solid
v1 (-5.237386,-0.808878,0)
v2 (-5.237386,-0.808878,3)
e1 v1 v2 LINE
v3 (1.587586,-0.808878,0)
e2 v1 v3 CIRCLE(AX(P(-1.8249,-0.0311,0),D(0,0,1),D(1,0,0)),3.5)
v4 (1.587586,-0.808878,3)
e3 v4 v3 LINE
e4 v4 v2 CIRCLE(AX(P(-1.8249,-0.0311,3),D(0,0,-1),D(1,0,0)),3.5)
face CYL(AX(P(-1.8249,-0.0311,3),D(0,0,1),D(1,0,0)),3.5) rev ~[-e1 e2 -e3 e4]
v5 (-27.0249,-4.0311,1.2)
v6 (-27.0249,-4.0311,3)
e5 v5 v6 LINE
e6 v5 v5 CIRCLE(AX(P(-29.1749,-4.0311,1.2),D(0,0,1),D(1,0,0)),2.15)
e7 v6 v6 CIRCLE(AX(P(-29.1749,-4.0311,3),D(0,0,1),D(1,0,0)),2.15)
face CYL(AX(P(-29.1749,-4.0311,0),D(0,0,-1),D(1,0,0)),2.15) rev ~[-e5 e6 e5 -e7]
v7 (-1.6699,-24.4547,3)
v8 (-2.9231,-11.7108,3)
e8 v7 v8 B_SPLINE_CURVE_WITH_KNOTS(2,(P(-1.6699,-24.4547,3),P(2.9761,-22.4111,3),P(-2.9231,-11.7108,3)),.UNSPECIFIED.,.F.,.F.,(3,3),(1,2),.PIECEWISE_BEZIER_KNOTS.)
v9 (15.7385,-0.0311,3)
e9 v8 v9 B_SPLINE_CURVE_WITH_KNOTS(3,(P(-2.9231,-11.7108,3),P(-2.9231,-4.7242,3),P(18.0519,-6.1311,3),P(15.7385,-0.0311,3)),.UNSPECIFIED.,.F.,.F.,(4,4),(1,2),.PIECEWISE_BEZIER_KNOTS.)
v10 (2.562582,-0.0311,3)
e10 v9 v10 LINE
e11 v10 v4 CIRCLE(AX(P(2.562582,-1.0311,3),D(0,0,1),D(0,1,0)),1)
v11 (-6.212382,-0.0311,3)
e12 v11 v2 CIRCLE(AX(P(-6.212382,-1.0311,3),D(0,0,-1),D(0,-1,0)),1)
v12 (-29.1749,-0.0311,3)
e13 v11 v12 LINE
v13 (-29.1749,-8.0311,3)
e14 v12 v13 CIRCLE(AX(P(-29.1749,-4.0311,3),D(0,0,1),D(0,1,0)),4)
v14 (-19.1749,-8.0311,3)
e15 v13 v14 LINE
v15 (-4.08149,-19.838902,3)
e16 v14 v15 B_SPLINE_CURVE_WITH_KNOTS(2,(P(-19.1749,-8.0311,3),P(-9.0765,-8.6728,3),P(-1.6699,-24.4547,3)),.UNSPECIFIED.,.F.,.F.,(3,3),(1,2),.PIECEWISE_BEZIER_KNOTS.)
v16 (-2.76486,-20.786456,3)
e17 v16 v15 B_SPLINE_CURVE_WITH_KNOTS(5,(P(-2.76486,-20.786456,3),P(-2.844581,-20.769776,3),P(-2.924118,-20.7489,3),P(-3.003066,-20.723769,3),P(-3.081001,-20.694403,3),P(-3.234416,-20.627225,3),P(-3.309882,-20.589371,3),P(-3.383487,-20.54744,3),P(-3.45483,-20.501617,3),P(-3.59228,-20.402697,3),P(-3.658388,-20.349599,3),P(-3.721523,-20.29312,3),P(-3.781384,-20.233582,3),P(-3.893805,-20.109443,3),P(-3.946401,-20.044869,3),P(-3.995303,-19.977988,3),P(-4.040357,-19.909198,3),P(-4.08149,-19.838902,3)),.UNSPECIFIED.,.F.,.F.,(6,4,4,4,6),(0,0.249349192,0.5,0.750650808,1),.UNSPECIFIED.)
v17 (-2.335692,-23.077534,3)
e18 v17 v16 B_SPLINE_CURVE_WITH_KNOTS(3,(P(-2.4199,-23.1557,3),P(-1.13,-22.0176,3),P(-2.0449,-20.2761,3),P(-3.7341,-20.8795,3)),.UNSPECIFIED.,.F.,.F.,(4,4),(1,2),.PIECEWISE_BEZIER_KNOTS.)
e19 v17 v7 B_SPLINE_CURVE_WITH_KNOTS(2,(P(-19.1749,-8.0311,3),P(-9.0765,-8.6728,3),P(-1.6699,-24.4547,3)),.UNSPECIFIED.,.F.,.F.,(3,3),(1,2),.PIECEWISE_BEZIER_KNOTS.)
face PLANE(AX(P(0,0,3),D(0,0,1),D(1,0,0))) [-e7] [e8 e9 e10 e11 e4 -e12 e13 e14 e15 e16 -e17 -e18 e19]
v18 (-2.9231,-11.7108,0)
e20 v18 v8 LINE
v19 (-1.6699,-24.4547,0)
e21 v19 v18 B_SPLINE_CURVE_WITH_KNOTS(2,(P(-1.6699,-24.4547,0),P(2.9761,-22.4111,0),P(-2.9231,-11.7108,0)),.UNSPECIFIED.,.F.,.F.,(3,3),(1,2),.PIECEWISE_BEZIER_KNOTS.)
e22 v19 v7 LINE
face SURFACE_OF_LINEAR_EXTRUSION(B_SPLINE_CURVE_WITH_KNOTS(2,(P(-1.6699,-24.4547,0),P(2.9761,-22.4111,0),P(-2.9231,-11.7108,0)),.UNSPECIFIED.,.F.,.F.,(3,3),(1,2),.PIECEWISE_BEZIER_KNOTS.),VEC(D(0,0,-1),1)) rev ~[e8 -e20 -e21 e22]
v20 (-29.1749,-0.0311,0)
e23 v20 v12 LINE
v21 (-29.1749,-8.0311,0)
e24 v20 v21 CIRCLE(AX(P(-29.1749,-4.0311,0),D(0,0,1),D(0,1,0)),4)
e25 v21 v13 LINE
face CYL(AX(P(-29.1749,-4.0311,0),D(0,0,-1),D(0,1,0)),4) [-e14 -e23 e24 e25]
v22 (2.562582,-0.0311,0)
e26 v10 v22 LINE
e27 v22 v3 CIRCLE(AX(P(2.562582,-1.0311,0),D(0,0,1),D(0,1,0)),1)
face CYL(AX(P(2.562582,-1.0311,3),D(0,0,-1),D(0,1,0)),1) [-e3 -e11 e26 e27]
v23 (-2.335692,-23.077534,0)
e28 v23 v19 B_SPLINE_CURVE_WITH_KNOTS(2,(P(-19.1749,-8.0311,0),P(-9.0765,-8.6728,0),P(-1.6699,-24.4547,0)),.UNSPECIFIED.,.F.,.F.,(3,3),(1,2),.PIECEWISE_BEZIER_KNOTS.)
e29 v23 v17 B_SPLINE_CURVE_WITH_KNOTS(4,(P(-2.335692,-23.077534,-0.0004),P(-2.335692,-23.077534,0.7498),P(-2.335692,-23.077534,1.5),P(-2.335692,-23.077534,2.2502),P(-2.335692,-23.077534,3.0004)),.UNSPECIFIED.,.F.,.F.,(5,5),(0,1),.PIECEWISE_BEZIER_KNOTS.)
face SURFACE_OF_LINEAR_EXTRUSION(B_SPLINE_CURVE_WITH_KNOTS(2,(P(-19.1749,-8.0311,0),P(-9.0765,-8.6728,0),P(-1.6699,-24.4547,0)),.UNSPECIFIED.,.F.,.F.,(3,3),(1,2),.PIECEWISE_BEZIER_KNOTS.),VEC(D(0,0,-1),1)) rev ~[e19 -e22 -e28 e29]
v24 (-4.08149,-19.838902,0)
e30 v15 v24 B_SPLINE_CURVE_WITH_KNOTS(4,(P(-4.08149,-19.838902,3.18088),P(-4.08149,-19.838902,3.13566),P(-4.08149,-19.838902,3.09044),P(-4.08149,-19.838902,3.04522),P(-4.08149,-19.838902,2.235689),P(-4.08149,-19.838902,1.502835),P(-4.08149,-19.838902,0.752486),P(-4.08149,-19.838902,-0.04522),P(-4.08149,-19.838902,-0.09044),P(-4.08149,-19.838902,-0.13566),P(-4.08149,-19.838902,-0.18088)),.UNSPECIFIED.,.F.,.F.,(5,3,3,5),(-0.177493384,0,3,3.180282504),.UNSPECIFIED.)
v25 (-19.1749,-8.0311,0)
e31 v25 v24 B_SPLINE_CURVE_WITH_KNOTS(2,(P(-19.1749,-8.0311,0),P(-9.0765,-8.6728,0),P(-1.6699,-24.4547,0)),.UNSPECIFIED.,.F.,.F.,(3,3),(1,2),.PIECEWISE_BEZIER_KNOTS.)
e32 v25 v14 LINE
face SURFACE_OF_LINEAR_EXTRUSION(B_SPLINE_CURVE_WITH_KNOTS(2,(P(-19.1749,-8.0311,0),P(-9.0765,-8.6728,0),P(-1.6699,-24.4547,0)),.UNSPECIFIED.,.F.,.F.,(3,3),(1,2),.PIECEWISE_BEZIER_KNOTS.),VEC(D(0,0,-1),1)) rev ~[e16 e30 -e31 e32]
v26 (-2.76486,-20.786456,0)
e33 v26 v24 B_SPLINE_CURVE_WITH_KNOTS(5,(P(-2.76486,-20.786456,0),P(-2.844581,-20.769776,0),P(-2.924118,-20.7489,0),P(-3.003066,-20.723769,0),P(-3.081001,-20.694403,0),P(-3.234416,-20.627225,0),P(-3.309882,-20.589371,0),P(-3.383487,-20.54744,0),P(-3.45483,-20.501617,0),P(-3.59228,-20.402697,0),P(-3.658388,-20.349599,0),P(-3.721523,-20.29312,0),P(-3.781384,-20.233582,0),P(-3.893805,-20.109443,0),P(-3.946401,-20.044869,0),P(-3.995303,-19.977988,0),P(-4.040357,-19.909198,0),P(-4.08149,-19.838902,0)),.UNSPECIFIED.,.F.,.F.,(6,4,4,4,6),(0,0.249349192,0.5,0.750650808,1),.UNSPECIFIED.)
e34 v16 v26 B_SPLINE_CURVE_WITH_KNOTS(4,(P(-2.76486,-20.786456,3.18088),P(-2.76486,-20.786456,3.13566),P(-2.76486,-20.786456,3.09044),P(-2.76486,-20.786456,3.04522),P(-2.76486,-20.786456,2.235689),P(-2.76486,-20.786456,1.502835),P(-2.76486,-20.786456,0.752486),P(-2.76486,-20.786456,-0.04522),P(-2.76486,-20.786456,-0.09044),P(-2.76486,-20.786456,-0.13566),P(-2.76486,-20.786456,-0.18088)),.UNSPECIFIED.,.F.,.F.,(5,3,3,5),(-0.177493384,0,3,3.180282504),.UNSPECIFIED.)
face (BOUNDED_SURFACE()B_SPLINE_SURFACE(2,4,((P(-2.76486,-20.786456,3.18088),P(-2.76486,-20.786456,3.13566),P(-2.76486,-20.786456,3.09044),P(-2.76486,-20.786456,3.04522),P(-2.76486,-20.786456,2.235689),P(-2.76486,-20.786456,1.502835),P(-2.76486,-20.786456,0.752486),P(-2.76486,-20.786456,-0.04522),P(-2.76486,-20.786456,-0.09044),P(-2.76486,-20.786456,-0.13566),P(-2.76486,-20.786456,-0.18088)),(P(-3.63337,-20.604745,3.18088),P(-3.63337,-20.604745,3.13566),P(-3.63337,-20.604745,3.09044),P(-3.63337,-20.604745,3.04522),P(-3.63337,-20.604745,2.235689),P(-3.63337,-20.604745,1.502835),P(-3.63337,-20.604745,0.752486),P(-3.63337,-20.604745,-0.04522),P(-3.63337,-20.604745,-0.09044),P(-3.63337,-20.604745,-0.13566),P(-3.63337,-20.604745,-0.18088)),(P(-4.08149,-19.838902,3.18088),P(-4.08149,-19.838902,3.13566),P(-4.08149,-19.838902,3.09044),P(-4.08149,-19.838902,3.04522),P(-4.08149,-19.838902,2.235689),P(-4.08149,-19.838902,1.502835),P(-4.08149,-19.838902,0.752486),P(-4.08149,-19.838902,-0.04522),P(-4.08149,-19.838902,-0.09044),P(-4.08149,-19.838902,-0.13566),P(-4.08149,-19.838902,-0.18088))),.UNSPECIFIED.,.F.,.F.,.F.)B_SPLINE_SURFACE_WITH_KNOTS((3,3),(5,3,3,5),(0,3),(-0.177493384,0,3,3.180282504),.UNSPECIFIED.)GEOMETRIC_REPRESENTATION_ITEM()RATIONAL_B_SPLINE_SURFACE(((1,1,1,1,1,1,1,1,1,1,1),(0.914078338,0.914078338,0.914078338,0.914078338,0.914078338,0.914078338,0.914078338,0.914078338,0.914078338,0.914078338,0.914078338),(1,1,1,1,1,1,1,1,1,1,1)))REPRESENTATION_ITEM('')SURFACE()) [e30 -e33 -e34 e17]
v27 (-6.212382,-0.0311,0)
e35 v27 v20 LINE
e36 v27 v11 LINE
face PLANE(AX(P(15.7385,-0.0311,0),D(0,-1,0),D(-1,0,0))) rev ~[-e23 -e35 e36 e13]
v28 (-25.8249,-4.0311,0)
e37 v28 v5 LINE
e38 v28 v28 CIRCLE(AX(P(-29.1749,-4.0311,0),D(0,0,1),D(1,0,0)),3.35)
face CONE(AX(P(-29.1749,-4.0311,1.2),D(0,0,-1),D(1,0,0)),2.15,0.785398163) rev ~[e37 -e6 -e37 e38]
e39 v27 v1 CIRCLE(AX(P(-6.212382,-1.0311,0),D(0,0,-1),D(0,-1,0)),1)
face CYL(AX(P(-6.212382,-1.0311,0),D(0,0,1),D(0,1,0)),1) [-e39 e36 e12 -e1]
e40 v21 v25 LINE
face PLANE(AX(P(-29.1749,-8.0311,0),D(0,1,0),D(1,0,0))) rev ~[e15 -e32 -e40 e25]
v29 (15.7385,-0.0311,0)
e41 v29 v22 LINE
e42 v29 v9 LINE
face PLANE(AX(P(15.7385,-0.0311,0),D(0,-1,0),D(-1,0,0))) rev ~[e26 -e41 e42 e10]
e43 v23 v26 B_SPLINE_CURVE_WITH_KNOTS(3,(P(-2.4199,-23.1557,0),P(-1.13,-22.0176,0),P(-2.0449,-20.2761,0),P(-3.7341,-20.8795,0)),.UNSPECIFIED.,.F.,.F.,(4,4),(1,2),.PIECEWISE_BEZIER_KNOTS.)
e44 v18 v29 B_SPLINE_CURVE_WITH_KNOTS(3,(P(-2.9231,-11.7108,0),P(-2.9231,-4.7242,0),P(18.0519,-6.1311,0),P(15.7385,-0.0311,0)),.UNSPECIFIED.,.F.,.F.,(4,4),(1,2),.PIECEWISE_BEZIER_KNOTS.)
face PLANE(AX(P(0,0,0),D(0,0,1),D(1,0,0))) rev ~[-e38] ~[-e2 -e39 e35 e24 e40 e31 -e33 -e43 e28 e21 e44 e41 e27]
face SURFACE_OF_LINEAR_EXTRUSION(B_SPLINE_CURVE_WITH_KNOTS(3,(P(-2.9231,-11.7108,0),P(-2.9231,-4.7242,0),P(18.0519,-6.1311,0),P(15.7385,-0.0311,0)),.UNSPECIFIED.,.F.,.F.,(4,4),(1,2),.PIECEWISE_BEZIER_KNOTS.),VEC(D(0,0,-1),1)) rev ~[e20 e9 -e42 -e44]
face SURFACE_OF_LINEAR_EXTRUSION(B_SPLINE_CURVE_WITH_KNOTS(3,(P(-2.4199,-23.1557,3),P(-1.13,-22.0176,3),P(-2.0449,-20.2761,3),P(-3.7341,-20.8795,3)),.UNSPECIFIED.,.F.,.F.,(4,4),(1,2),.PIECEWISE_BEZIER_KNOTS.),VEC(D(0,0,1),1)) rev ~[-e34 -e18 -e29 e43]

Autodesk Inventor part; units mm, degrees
ref_plane "YZ Plane" through (0, 0, 0) normal (1, 0, 0) x (0, 1, 0)
ref_plane "XZ Plane" through (0, 0, 0) normal (0, 1, 0) x (-1, 0, 0)
ref_plane "XY Plane" through (0, 0, 0) normal (0, 0, 1) x (1, 0, 0)
sketch "Sketch1" plane through (0, 0, 0) normal (0, 0, 1) x (1, 0, 0)
  line L0 (15.7385, -0.0311) -> (-29.1749, -0.0311)
  line L1 (-29.1749, -0.0311) -> (2.0558, -0.0311) construction
  line L2 (-29.1749, -8.0311) -> (-19.1749, -8.0311)
  line L3 (-19.1749, -8.0311) -> (-9.0765, -8.6728) construction
  line L4 (-9.0765, -8.6728) -> (-1.6699, -24.4547) construction
  spline S0 degree 2 poles (-19.1749, -8.0311) (-9.0765, -8.6728) (-1.6699, -24.4547) knots 1 1 1 2 2 2
  line L5 (-1.6699, -24.4547) -> (2.9761, -22.4111) construction
  line L6 (2.9761, -22.4111) -> (-2.9231, -11.7108) construction
  spline S1 degree 2 poles (-1.6699, -24.4547) (2.9761, -22.4111) (-2.9231, -11.7108) knots 1 1 1 2 2 2
  line L7 (-2.9231, -11.7108) -> (-2.9231, -4.7242) construction
  line L8 (-2.9231, -4.7242) -> (18.0519, -6.1311) construction
  line L9 (18.0519, -6.1311) -> (15.7385, -0.0311) construction
  spline S2 degree 3 poles (-2.9231, -11.7108) (-2.9231, -4.7242) (18.0519, -6.1311) (15.7385, -0.0311) knots 1 1 1 1 2 2 2 2
  arc A0 (-29.1749, -0.0311) -> (-29.1749, -8.0311) centre (-29.1749, -4.0311) ccw
  circle A1 centre (-29.1749, -4.0311) radius 2.15
  point P0 (0, 0)
  dimension "d0" = 8
  dimension "d1" = 10
  dimension "d2" = 4.3
extrude "Extrusion1" add sketch "Sketch1" along normal blind 3
sketch "Sketch2" plane through (0, 0, 3) normal (0, 0, 1) x (1, 0, 0)
  line L0 (15.7385, -0.0311) -> (-29.1749, -0.0311) projected
  line L1 (-29.1749, -0.0311) -> (-1.8249, -0.0311)
  circle A0 centre (-1.8249, -0.0311) radius 3.5
  point P0 (0, 0)
  dimension "d5" = 27.35
  dimension "d6" = 7
extrude "Extrusion2" cut sketch "Sketch2" against normal blind 3
sketch "Sketch3" plane through (0, 0, 3) normal (0, 0, 1) x (1, 0, 0)
  line L0 (-1.6699, -24.4547) -> (-2.4199, -23.1557)
  line L1 (-1.6699, -24.4547) -> (-0.1699, -24.4547) construction
  line L2 (-3.7341, -20.8795) -> (-2.4199, -23.1557)
  line L3 (-2.4199, -23.1557) -> (-1.13, -22.0176) construction
  line L4 (-1.13, -22.0176) -> (-2.0449, -20.2761) construction
  line L5 (-2.0449, -20.2761) -> (-3.7341, -20.8795) construction
  spline S0 degree 3 poles (-2.4199, -23.1557) (-1.13, -22.0176) (-2.0449, -20.2761) (-3.7341, -20.8795) knots 1 1 1 1 2 2 2 2
  point P0 (0, 0)
  dimension "d9" = 1.5
  dimension "d10" = 120
extrude "Extrusion3" cut sketch "Sketch3" against normal blind 3
fillet "Fillet2" radius 2 1 edges at (-3.5248, -20.8155, 1.5)
chamfer "Chamfer1" distance 1.2 angle 45 1 edges at (-31.3249, -4.0311, 0)
fillet "Fillet4" radius 1 2 edges at (1.6751, -0.0311, 1.5) (-5.3249, -0.0311, 1.5)
properties part number "retreat"
